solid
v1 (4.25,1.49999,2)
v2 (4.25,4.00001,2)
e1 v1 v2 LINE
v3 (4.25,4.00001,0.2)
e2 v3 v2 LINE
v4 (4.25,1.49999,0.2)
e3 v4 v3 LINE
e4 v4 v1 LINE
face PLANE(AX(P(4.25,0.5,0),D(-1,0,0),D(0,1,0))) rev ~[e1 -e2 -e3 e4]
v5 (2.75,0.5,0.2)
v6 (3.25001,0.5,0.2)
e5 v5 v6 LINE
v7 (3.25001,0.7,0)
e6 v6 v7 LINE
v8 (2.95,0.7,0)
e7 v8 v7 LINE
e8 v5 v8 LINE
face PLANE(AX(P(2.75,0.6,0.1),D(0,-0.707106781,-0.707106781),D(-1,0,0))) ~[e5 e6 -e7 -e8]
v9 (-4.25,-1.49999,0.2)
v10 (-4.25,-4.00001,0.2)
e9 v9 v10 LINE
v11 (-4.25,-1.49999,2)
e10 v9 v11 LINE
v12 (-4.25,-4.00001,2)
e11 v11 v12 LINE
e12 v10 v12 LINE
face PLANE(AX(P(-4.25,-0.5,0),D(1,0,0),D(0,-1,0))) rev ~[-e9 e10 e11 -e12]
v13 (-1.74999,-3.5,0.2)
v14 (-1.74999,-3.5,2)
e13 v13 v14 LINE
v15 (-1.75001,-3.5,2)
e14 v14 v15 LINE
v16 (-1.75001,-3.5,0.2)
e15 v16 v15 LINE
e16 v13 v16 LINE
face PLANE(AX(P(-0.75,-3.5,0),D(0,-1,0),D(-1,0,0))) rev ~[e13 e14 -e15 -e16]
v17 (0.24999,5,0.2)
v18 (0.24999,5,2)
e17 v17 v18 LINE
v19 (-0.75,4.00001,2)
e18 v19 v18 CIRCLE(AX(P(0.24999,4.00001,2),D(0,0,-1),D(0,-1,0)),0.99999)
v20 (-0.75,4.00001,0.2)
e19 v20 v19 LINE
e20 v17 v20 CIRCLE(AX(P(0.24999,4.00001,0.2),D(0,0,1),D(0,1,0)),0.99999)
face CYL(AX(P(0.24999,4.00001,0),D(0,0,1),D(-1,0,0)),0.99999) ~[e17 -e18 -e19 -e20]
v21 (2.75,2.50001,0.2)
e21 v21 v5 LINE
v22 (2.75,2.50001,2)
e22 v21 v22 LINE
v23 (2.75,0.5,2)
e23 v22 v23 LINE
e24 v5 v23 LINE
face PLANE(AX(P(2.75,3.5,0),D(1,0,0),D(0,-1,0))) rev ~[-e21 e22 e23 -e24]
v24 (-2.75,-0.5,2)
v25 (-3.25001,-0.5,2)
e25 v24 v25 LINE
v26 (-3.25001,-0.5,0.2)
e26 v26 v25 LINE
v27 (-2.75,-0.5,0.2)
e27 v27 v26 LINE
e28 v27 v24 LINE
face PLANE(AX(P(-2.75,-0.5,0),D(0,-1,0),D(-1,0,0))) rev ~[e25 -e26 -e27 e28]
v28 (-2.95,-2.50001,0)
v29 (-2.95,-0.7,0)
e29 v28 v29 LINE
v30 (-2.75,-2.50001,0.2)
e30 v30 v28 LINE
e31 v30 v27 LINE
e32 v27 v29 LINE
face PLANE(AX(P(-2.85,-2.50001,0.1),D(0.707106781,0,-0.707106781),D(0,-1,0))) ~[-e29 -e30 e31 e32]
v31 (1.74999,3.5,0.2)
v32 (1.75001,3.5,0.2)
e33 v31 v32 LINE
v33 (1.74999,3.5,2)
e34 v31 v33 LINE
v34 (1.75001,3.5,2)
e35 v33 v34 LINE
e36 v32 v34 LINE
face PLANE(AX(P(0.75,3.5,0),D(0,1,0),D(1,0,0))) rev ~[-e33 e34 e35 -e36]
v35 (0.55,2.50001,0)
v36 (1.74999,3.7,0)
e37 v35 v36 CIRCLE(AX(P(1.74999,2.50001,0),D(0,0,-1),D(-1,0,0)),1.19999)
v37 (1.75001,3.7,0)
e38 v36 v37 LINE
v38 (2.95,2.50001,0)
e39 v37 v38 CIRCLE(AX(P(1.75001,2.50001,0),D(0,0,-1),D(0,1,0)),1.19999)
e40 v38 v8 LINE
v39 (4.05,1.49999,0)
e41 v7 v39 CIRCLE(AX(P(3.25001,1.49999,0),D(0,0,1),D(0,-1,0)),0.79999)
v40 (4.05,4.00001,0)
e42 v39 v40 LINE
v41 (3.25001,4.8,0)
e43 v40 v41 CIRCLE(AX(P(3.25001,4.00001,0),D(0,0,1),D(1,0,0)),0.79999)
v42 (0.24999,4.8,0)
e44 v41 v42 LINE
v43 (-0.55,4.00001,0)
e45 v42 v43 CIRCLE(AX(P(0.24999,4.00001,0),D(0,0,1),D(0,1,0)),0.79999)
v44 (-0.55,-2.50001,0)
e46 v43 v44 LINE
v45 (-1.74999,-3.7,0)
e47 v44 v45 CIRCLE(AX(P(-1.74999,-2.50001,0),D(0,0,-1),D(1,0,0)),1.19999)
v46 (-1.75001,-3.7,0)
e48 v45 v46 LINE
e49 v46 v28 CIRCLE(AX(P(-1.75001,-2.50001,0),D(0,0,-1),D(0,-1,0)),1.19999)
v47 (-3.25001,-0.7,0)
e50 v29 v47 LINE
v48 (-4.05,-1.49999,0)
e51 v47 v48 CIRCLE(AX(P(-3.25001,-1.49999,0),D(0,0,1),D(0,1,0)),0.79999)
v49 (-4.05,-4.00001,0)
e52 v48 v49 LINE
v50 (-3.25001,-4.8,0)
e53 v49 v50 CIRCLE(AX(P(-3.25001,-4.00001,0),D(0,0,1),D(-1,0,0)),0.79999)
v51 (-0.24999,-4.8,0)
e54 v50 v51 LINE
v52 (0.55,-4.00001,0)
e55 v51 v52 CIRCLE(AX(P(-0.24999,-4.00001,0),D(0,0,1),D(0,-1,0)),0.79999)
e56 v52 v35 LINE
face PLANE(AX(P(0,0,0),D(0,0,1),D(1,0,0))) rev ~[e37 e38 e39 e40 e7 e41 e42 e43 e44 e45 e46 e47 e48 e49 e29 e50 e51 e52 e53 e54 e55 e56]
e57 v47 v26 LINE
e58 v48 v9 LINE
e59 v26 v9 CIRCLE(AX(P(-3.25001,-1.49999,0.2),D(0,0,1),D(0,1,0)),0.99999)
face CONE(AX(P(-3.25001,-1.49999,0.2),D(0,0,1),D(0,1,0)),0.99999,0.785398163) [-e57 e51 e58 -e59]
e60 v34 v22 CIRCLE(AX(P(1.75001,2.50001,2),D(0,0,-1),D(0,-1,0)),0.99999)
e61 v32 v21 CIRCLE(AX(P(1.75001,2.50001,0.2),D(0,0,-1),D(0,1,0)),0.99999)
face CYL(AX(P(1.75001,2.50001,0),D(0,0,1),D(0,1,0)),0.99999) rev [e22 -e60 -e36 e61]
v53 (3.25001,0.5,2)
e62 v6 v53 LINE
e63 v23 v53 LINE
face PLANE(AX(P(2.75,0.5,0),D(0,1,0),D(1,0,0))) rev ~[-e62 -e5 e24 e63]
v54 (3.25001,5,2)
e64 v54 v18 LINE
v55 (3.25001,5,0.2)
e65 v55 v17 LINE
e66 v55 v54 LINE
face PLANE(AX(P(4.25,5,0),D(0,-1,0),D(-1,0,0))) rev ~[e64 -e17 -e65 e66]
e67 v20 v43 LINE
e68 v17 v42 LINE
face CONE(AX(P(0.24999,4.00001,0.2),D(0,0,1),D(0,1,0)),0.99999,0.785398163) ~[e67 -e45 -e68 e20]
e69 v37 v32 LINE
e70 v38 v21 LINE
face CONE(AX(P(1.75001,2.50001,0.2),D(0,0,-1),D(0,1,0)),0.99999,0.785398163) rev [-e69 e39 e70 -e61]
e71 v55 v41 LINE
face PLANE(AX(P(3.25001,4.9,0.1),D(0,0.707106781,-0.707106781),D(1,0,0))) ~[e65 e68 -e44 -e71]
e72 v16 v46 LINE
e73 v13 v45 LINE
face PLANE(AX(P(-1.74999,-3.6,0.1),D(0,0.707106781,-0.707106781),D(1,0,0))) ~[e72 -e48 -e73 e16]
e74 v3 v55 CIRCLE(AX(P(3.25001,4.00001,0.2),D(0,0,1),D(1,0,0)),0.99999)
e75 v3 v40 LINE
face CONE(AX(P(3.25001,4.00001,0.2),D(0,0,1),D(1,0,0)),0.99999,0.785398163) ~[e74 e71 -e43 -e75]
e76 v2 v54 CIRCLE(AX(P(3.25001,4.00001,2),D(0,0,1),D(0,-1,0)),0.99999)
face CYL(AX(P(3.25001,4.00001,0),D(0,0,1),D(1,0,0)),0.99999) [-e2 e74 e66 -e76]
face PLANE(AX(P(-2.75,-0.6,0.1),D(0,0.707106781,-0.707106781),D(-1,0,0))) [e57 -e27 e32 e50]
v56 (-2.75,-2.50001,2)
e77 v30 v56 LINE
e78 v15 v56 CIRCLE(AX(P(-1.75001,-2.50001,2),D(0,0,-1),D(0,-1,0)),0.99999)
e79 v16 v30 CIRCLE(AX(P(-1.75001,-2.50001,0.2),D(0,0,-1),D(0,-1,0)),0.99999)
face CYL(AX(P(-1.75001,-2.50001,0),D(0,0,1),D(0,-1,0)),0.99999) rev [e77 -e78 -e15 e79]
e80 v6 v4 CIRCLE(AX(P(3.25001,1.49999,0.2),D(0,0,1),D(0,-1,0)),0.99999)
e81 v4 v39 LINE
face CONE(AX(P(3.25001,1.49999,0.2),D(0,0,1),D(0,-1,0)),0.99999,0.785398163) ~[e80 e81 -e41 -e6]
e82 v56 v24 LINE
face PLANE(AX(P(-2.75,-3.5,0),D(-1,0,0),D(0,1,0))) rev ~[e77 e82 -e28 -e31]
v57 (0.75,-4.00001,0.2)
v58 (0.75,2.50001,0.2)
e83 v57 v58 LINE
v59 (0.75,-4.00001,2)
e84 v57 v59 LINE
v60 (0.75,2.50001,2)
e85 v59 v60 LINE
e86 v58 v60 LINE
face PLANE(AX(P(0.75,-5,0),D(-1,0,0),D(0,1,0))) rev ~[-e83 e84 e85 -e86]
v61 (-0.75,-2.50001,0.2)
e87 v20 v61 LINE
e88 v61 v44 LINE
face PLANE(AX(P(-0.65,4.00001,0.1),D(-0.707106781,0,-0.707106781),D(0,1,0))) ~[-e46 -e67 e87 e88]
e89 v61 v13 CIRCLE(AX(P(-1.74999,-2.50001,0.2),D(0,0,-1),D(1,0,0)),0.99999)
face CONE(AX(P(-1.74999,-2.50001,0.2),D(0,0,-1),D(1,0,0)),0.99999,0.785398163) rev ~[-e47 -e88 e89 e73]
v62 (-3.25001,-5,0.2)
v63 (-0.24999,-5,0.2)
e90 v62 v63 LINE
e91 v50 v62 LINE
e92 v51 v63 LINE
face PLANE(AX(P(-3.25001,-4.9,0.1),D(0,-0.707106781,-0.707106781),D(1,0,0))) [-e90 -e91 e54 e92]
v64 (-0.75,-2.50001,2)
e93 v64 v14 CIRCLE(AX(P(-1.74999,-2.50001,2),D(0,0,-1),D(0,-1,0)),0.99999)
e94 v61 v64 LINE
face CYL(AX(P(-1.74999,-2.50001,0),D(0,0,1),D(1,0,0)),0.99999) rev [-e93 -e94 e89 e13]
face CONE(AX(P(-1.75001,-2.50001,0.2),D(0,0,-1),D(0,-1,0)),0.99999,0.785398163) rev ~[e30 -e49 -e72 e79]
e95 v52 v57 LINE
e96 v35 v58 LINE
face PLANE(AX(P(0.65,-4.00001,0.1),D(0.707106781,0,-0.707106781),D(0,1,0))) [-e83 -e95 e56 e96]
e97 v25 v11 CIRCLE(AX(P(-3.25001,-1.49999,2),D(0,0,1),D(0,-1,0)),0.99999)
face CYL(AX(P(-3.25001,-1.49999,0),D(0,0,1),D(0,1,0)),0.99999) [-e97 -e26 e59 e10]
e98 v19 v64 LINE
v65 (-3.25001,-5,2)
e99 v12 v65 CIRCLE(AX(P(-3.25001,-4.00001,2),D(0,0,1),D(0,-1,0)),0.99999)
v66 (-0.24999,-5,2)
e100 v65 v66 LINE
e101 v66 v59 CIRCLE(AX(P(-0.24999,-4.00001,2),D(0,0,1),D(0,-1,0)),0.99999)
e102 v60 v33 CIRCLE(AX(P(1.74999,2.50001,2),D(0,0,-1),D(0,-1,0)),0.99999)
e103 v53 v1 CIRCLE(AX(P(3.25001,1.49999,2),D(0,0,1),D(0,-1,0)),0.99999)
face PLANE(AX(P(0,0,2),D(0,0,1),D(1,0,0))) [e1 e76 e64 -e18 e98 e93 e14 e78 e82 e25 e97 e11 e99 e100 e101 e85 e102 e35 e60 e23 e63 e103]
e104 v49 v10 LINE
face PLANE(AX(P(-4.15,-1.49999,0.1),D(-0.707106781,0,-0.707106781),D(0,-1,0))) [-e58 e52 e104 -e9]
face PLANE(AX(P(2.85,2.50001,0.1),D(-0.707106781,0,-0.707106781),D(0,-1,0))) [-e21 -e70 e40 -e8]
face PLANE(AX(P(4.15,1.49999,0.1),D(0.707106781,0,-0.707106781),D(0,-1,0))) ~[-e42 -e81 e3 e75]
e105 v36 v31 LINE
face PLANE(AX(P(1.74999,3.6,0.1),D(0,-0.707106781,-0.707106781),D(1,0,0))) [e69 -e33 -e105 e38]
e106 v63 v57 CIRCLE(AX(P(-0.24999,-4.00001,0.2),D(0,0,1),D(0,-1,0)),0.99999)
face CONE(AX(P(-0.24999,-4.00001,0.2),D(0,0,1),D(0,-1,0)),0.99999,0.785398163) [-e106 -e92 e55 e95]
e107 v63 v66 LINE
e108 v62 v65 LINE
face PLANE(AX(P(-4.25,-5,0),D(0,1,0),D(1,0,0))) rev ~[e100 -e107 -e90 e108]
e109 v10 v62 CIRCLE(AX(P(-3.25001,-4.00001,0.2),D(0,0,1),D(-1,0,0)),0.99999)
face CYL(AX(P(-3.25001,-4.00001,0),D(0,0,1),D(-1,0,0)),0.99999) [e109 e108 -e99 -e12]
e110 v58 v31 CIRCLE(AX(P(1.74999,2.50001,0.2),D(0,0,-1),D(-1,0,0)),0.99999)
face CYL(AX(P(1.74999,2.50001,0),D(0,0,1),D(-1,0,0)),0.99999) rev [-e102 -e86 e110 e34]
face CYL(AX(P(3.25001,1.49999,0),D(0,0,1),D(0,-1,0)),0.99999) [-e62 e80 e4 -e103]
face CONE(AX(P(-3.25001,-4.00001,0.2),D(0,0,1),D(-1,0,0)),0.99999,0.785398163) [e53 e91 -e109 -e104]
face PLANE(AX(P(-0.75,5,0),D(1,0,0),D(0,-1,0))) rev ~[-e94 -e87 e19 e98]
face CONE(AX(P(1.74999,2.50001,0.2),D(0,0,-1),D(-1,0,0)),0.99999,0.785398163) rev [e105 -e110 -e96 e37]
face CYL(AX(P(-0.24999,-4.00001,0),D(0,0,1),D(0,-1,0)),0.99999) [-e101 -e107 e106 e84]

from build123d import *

# Parameters (mm, degrees)
F1_DEPTH = 2
F2_R     = 0.99999
F3_SIZE  = 0.2


# Not quite as in the source:
# - a fillet or chamfer is up to 0.001 mm smaller than in the source, because OpenCascade refuses the exact size


with BuildPart() as f1:
    # F0 (on Top) → F1 (new body)
    with BuildSketch(Plane.XY):
        Polygon((-0.75, 5), (-0.75, 0), (-0.75, -3.5), (-2.75, -3.5), (-2.75, -0.5), (-4.25, -0.5), (-4.25, -5), (0.75, -5), (0.75, 0), (0.75, 3.5), (2.75, 3.5), (2.75, 0.5), (4.25, 0.5), (4.25, 5), align=None)
    extrude(amount=F1_DEPTH)

    # F2 (radius 1 in the source; OpenCascade refuses exactly that, so slightly less here)
    f2_edges = [f1.edges().sort_by_distance(p)[0] for p in [
        (-0.75, 5, 1),
        (0.75, 3.5, 1),
        (2.75, 3.5, 1),
        (4.25, 5, 1),
        (4.25, 0.5, 1),
        (0.75, -5, 1),
        (-4.25, -5, 1),
        (-4.25, -0.5, 1),
        (-0.75, -3.5, 1),
        (-2.75, -3.5, 1),
    ]]
    fillet(f2_edges, radius=F2_R)

    # F3
    f3_edges = [f1.edges().sort_by_distance(p)[0] for p in [
        (-0.75, 0.75, 0),
        (-0.45711, 4.70711, 0),
        (-1.04289, -3.20711, 0),
        (1.75, 5, 0),
        (-1.75, -3.5, 0),
        (3.95711, 4.70711, 0),
        (-2.45711, -3.20711, 0),
        (4.25, 2.75, 0),
        (-2.75, -1.500005, 0),
        (3.95711, 0.79289, 0),
        (-3.000005, -0.5, 0),
        (3.000005, 0.5, 0),
        (-3.95711, -0.79289, 0),
        (2.75, 1.500005, 0),
        (-4.25, -2.75, 0),
        (2.45711, 3.20711, 0),
        (-3.95711, -4.70711, 0),
        (1.75, 3.5, 0),
        (-1.75, -5, 0),
        (1.04289, 3.20711, 0),
        (0.45711, -4.70711, 0),
        (0.75, -0.75, 0),
    ]]
    chamfer(f3_edges, length=F3_SIZE)


solid = f1.part
